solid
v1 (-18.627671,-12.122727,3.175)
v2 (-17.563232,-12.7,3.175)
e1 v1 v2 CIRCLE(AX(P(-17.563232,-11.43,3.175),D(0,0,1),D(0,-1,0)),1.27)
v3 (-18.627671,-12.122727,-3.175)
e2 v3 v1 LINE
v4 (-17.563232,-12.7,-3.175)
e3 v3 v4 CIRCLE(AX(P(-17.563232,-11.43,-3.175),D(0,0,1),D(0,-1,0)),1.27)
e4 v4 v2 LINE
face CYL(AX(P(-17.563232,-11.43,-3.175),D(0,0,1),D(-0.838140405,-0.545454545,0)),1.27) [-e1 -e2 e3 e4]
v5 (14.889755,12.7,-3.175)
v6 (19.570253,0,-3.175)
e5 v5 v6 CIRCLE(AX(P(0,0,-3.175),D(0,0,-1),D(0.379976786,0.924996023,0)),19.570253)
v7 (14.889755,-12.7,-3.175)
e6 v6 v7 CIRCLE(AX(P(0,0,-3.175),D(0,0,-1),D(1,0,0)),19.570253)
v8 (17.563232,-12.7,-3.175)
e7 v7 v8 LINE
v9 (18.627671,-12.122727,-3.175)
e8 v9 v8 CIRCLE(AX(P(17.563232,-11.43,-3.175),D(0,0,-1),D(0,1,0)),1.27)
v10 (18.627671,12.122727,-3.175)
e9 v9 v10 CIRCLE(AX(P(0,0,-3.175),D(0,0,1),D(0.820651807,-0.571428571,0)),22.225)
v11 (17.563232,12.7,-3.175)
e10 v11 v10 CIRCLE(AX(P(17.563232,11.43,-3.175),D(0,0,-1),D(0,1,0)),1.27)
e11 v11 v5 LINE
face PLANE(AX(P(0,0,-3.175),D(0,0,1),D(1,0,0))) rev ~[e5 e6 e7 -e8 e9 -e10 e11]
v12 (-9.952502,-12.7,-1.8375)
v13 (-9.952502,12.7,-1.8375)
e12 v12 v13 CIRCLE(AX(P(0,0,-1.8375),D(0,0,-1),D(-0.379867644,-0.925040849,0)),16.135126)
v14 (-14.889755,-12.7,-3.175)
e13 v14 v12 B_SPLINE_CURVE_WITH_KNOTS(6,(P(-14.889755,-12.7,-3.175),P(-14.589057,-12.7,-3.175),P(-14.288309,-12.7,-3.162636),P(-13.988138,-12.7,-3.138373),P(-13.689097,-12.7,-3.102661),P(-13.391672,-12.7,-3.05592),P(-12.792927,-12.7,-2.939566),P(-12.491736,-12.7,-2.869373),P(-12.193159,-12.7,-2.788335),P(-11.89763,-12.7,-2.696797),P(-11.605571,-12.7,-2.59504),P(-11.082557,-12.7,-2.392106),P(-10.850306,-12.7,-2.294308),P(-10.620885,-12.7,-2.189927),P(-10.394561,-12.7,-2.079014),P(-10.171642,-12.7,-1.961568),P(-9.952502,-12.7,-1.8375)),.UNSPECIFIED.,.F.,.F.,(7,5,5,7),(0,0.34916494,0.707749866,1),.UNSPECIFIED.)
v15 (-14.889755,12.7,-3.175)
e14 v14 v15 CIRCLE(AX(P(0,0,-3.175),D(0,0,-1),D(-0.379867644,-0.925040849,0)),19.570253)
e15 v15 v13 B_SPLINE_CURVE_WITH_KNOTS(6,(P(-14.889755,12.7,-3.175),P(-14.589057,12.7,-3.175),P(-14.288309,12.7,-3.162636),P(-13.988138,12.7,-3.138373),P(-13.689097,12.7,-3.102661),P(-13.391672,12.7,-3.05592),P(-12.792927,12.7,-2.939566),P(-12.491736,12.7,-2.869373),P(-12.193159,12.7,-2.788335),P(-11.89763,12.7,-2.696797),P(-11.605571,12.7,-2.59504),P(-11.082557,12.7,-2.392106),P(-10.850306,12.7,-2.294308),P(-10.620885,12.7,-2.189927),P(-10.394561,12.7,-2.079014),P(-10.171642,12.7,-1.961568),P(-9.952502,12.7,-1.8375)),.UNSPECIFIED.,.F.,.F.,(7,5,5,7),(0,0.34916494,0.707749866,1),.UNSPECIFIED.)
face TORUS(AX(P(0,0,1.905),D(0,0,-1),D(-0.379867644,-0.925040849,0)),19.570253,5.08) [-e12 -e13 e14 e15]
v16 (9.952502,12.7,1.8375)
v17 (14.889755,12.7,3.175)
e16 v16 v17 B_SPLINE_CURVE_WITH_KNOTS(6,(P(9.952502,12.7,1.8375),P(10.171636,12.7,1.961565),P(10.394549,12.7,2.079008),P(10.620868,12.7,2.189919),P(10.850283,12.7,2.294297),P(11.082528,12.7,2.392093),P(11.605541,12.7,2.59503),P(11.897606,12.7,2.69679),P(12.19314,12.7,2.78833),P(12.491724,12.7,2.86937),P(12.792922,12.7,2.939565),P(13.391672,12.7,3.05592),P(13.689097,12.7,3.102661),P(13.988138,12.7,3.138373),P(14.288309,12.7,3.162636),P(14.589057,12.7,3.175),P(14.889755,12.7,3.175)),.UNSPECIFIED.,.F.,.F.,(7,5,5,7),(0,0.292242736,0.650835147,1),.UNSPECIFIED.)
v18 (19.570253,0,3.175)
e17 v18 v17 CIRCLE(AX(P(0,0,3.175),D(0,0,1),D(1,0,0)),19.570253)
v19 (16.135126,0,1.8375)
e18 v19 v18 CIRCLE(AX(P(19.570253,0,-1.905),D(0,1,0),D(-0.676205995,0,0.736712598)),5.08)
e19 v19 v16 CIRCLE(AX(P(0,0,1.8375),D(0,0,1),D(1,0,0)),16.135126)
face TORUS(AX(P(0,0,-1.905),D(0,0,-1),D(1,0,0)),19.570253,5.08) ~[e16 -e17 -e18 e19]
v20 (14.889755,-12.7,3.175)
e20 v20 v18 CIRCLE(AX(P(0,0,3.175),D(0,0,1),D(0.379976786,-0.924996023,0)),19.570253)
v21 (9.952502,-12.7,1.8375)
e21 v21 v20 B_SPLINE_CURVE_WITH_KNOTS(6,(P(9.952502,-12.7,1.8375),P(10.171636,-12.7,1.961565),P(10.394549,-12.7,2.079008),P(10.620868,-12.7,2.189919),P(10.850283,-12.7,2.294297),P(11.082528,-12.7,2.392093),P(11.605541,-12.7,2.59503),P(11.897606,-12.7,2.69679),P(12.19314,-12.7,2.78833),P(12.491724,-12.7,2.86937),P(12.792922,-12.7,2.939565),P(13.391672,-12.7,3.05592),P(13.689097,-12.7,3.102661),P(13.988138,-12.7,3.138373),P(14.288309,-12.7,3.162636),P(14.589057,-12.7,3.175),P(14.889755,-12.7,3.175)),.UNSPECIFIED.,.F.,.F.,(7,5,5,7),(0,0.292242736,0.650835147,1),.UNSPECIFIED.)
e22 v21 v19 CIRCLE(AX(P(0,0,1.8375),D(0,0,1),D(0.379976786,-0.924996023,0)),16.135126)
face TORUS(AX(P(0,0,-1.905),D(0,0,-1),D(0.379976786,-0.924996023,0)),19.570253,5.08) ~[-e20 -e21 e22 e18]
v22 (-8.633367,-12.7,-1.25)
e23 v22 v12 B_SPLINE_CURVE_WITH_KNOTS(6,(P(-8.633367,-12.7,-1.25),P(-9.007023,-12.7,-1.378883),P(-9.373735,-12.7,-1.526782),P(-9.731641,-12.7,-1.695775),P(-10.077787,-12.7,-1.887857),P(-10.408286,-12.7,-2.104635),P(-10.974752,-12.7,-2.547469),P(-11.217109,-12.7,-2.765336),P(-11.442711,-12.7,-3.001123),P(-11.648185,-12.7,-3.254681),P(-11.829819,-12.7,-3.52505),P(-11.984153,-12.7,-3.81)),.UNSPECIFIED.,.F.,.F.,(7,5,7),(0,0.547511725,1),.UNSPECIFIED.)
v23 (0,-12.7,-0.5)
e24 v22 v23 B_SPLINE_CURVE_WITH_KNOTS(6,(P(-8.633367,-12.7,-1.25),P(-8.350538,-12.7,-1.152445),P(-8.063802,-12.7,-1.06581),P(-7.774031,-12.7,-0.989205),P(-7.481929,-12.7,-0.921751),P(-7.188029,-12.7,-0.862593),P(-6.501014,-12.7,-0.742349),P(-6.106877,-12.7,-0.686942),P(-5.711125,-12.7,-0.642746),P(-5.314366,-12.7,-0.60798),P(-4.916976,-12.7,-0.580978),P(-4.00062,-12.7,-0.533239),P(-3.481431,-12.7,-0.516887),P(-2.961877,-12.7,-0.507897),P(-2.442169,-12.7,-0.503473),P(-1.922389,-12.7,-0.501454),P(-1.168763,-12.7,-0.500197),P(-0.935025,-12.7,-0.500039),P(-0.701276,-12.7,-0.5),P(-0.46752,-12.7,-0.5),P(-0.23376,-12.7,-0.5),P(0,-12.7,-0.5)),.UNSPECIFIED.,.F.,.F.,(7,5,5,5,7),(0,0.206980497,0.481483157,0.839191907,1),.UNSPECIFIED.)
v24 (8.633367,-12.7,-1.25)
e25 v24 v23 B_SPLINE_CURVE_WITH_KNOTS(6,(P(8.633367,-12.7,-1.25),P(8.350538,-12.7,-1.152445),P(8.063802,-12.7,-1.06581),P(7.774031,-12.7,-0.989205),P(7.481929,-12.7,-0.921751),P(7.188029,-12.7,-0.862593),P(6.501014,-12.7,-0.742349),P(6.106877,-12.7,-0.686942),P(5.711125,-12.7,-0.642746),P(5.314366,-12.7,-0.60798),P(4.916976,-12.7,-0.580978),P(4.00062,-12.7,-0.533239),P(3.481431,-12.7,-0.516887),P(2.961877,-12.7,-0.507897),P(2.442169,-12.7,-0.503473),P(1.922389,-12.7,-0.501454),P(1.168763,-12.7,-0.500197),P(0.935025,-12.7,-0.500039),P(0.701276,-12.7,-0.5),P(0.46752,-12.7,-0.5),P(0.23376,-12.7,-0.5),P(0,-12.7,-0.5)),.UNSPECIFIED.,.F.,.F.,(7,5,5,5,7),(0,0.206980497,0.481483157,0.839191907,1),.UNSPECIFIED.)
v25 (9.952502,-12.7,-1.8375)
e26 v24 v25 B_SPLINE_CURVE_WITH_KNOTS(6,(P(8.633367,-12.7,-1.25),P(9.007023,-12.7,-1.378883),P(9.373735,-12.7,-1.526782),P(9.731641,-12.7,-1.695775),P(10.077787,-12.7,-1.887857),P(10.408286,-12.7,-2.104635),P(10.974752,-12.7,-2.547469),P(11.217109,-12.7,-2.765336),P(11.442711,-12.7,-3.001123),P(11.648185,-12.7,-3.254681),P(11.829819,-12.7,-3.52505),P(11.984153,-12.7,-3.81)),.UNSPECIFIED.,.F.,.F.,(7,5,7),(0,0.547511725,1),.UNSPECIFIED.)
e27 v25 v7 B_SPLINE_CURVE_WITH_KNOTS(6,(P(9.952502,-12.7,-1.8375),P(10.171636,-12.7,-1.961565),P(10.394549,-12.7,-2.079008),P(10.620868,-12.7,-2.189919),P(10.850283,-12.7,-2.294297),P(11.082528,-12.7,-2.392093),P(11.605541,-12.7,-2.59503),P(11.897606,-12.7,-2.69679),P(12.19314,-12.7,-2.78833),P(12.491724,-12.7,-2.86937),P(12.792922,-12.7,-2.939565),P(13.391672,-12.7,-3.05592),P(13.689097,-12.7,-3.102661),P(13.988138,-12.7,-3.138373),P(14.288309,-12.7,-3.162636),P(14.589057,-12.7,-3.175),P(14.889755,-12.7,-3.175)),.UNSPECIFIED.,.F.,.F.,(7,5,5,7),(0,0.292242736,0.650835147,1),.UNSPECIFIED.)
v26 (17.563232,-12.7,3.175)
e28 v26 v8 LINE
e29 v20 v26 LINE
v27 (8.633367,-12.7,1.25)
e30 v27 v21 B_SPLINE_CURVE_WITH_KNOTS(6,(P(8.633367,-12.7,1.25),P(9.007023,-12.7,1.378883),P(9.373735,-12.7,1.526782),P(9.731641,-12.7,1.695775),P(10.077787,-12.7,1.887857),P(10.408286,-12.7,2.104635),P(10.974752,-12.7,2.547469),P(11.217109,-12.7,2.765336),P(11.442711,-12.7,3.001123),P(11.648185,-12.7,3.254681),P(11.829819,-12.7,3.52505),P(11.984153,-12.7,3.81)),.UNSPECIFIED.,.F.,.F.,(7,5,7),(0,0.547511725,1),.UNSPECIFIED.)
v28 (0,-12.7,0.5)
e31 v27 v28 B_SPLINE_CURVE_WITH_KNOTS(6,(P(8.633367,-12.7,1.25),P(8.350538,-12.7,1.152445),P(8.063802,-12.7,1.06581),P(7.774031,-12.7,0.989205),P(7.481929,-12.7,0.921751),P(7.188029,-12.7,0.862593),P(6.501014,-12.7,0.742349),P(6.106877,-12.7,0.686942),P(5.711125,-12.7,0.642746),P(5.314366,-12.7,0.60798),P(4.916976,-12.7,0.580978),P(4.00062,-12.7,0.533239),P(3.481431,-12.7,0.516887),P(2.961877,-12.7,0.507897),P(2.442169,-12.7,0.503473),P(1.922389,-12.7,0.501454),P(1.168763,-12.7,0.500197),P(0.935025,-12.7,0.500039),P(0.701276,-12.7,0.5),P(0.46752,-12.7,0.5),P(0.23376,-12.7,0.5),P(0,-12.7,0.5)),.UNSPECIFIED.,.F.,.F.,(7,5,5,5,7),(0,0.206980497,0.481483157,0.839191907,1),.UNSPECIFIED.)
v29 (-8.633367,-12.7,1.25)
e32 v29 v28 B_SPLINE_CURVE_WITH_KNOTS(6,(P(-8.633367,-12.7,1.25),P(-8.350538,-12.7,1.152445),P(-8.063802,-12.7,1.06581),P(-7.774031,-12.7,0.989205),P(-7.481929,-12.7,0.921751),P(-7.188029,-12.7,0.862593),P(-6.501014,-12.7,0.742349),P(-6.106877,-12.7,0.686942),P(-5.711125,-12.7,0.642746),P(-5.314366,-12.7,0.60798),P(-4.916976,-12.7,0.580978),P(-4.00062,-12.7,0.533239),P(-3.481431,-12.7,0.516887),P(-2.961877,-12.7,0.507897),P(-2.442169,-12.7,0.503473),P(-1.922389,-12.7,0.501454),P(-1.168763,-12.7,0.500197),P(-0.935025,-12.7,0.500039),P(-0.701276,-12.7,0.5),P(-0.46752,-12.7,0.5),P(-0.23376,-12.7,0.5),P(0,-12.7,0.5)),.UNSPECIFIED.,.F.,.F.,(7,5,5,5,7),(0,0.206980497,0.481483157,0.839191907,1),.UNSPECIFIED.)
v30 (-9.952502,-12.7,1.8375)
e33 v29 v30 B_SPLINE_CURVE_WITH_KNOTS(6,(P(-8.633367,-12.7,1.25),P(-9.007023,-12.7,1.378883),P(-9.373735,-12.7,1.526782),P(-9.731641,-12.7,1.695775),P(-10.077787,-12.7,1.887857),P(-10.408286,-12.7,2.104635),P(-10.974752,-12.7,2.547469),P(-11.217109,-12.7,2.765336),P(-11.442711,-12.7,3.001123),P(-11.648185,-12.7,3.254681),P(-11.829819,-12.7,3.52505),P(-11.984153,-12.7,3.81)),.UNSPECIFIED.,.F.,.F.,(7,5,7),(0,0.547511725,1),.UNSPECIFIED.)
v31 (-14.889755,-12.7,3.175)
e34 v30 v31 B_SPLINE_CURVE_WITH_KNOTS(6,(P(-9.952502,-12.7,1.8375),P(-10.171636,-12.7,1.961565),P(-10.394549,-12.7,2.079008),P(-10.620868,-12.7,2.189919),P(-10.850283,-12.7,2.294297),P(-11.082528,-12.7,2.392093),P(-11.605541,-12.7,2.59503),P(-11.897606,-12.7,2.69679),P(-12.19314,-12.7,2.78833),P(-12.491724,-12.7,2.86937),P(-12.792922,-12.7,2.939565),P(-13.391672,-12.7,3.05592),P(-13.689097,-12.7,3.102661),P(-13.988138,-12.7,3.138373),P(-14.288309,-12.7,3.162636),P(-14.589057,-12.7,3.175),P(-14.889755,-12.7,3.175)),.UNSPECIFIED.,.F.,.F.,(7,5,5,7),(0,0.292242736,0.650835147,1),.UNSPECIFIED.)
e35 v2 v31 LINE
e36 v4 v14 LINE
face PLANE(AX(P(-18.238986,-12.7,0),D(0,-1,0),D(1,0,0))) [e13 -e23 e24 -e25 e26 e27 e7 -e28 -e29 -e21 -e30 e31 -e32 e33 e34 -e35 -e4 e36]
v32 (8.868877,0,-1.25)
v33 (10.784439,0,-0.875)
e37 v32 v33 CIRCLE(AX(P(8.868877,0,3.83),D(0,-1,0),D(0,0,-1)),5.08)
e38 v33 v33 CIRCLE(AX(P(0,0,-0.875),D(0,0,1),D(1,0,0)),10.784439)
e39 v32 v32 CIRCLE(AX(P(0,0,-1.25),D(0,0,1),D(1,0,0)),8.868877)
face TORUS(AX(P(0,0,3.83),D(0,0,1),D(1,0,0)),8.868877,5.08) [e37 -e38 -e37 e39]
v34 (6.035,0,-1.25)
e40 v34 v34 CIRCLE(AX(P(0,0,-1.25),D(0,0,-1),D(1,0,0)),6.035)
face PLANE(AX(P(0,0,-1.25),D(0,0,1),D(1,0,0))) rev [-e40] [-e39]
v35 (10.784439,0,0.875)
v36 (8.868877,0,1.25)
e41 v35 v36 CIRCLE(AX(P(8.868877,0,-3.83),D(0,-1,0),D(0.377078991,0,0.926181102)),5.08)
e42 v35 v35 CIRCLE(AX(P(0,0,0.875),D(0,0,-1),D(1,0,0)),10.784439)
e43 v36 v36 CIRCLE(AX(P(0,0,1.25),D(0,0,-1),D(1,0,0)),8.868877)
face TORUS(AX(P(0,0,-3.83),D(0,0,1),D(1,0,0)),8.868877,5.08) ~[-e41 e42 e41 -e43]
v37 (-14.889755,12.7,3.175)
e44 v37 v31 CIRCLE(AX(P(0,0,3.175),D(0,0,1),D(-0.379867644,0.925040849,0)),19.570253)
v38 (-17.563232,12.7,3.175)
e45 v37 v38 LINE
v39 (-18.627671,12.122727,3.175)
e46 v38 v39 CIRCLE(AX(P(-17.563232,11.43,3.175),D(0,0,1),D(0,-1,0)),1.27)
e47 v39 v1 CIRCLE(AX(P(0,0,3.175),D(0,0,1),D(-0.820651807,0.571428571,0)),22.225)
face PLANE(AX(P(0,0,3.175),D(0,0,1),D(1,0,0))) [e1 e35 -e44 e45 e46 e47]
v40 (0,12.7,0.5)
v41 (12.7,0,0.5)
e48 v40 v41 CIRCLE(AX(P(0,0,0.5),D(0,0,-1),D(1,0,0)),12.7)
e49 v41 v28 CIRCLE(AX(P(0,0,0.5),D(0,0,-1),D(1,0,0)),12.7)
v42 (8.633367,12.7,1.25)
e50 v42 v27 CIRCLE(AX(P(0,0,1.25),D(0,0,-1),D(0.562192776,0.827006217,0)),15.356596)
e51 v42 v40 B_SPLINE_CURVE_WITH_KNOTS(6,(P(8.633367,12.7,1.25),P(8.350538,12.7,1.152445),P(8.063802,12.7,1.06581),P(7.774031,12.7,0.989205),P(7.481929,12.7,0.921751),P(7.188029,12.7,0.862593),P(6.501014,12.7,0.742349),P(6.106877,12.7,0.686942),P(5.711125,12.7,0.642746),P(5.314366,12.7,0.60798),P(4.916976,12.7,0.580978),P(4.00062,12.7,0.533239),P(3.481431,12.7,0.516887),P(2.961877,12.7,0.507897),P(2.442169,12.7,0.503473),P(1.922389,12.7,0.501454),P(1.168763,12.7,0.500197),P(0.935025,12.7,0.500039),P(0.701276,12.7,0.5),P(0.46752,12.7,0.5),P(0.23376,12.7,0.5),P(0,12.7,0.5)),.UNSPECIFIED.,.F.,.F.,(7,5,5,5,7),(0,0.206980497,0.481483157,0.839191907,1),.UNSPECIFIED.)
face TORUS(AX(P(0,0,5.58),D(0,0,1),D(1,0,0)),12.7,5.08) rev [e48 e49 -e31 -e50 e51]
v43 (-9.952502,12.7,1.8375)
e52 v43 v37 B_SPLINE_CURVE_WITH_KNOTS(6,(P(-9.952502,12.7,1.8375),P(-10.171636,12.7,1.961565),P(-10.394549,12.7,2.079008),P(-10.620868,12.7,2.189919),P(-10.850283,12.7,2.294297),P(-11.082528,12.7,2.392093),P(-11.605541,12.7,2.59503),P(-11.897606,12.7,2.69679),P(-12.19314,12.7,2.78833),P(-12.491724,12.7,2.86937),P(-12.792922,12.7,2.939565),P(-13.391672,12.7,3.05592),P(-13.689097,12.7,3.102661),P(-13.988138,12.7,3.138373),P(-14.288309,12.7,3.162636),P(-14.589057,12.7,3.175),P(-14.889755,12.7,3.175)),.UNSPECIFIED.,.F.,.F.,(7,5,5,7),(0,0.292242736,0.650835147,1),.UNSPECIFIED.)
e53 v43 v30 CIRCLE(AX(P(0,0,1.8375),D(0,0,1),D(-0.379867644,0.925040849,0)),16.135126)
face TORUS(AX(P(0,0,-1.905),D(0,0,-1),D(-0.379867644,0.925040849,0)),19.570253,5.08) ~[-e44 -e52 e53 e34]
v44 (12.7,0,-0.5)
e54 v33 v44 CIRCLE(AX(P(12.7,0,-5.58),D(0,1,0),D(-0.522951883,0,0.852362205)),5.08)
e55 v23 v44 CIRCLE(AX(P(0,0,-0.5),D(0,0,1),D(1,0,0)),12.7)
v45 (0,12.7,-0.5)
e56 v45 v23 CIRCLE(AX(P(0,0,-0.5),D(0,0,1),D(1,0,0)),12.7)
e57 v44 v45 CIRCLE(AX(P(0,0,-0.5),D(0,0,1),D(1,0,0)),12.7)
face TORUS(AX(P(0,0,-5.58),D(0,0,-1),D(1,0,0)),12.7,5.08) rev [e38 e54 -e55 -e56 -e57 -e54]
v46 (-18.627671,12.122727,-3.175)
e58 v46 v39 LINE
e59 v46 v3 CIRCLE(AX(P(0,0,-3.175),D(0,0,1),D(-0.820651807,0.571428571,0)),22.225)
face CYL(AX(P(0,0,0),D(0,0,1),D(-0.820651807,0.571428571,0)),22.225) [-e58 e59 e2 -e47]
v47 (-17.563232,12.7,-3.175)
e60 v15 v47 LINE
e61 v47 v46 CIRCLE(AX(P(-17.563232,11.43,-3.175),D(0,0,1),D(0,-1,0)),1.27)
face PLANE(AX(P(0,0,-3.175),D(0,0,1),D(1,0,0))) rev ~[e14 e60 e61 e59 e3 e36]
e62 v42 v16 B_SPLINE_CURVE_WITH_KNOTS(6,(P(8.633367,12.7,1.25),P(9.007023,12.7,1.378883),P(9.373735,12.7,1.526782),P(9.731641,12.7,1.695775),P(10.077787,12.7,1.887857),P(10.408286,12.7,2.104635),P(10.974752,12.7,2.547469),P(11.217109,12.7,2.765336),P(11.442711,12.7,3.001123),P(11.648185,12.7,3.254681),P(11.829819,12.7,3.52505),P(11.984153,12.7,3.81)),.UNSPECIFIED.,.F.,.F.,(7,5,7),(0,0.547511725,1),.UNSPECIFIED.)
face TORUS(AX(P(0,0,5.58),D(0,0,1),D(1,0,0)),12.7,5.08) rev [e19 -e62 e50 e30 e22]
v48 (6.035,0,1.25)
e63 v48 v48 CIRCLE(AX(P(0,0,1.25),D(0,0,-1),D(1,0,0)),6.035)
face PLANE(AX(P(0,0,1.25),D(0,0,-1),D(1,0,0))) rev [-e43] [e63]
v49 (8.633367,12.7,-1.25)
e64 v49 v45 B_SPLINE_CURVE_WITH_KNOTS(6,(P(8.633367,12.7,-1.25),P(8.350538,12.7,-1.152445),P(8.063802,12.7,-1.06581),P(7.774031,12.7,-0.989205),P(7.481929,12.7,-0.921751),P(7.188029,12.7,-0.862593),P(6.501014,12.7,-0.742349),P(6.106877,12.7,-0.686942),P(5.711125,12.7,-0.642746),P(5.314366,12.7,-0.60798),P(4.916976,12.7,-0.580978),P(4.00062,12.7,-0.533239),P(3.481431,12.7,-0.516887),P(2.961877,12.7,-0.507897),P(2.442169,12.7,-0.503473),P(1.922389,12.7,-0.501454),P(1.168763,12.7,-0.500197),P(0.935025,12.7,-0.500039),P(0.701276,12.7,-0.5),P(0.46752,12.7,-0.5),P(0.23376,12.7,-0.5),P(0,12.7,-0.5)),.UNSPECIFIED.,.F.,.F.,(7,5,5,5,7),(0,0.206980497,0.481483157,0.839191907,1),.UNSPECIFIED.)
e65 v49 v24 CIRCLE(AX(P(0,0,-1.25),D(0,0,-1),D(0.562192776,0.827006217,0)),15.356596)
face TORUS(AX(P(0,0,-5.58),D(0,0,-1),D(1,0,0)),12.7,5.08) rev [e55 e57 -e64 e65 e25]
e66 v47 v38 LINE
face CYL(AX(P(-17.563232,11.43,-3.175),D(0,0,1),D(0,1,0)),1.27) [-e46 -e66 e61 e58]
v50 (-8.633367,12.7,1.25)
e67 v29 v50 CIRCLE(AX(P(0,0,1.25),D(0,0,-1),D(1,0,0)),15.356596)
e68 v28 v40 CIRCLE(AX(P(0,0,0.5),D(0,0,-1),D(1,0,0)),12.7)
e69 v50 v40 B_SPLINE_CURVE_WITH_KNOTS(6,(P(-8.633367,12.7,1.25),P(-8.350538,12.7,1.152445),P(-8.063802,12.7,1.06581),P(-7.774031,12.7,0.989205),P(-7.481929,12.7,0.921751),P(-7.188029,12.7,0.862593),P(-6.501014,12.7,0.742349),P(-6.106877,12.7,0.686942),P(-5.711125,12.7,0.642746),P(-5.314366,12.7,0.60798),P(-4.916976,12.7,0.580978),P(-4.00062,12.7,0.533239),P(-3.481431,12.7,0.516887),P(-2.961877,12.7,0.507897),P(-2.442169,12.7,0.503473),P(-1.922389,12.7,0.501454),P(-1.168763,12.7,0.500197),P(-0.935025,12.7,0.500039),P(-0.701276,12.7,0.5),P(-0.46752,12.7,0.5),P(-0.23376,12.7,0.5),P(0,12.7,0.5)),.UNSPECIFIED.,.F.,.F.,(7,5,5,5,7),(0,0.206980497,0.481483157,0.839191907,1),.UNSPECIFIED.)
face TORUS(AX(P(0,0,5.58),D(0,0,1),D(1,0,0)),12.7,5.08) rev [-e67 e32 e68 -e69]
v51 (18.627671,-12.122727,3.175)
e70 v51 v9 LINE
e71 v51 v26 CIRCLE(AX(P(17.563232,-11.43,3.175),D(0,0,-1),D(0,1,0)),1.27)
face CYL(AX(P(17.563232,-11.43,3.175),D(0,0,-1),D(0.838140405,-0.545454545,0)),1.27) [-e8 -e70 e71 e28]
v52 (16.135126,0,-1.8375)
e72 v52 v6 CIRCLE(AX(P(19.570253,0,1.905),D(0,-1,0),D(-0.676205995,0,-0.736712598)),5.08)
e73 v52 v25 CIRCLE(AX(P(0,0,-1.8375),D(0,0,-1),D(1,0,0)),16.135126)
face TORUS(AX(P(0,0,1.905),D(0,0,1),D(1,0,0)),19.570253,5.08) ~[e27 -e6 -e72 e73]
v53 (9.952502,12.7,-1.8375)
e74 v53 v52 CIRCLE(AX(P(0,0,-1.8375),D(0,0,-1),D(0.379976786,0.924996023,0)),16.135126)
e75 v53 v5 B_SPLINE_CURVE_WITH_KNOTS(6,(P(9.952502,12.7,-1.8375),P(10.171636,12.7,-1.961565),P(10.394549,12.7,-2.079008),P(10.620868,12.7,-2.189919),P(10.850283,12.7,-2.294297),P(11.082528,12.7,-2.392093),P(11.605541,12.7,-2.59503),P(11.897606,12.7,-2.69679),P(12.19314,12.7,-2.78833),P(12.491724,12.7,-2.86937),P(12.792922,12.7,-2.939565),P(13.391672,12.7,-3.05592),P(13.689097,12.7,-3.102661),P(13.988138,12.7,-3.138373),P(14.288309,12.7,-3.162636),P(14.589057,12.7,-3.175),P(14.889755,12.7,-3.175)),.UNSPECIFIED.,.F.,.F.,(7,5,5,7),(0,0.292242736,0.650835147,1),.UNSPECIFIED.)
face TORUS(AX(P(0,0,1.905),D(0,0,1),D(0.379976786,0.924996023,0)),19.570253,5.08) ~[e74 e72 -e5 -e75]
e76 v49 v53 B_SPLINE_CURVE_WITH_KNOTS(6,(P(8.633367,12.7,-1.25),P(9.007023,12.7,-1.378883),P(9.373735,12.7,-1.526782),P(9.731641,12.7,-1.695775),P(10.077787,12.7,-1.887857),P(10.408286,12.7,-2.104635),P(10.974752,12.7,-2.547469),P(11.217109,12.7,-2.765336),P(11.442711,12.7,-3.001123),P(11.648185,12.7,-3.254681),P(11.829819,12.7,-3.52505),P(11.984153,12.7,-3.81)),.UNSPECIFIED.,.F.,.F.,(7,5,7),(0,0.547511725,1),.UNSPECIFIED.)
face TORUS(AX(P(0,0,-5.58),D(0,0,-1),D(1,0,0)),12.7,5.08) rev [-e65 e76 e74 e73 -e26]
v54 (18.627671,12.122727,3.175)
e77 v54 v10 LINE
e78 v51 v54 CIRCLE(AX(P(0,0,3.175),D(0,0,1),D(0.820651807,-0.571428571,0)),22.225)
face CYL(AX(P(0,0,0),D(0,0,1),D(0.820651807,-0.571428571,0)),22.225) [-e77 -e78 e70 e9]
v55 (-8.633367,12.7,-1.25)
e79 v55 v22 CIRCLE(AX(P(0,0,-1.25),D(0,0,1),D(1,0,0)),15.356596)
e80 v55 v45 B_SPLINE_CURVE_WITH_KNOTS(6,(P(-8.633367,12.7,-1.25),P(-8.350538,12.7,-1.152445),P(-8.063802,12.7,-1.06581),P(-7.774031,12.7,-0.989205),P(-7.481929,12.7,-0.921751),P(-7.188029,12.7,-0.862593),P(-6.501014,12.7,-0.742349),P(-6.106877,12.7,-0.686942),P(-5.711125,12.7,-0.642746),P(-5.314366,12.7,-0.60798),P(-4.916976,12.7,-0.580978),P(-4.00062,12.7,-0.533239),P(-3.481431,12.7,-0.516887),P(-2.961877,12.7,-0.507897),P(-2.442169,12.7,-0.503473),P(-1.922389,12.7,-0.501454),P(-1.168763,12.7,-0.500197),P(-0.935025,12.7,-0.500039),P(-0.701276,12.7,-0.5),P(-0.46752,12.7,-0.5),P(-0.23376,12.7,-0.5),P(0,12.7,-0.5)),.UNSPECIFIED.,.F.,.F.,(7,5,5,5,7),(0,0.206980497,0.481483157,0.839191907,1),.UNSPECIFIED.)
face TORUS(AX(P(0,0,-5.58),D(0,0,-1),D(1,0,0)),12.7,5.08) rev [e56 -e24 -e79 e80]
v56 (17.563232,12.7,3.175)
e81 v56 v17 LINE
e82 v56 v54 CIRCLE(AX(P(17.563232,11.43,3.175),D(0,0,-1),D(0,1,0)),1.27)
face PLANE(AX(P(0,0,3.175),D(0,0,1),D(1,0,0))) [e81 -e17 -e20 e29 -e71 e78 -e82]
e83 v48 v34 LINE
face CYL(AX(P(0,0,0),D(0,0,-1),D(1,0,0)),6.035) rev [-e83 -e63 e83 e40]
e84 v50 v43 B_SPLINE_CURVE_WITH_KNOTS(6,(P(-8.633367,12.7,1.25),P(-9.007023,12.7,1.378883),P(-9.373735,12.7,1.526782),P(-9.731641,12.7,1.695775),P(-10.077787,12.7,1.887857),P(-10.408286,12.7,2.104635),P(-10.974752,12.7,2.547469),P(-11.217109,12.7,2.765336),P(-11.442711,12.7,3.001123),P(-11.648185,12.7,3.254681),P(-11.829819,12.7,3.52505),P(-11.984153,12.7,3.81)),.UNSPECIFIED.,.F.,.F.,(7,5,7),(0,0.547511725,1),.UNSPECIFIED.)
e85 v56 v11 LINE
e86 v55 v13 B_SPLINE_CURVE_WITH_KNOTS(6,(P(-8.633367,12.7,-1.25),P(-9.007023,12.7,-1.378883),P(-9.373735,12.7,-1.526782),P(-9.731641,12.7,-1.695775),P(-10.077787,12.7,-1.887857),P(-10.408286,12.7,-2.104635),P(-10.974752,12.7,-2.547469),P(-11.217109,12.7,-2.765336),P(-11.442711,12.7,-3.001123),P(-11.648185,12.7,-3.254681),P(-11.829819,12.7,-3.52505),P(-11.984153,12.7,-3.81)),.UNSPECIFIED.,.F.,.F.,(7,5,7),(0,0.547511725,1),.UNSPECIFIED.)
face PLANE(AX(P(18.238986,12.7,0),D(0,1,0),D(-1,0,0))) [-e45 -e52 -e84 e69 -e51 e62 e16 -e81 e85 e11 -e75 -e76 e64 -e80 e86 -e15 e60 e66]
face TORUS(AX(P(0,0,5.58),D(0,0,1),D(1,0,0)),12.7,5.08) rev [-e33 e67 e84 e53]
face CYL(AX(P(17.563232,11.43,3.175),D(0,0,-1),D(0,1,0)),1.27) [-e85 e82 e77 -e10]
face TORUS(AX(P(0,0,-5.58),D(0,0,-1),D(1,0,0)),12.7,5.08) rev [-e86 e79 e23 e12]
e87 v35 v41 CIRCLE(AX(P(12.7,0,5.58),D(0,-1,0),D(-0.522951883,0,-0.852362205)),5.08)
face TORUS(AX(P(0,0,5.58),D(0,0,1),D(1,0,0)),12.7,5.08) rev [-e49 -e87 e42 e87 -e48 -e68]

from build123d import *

# Parameters (mm, degrees)
F0_R            = 6.035
F1_DEPTH        = 3.175
F3_COPIES_COUNT = 2
F4_T3_ANGLE     = 67.6677552602
F4_T6_ANGLE     = 67.6677552602
F4_T9_ANGLE     = 135.3490310549
F4_T18_ANGLE    = 135.3490310549
F4_T21_ANGLE    = 67.6677552602
F4_T24_ANGLE    = 67.6677552602
F5_R            = 1.27


# Not quite as in the source:
# - a fillet or chamfer that OpenCascade refuses, or shapes differently, is made with other operations: its cross-section is extruded or revolved along the edge and cut away or added
# - a pattern or mirror of a feature is missing from the dataset's text; its kind, count and spacing are read off the source's solid


with BuildPart() as f1:
    # F0 (on Top) → F1 (new body, symmetric)
    with BuildSketch(Plane.XY):
        with BuildLine():
            Line((18.2389864028, 12.7), (-18.2389864028, 12.7))
            ThreePointArc((-18.2389864028, 12.7), (-22.225, 0), (-18.2389864028, -12.7))
            Line((-18.2389864028, -12.7), (18.2389864028, -12.7))
            ThreePointArc((18.2389864028, -12.7), (22.225, 0), (18.2389864028, 12.7))
        make_face()
        Circle(F0_R, mode=Mode.SUBTRACT)
    extrude(amount=F1_DEPTH, both=True)

    # F2 (on Front) → F3 (revolve, cut)
    with BuildSketch(Plane.XZ):
        with BuildLine():
            ThreePointArc((15.3565955658, 1.25), (17.1329395143, 3.0989826153), (17.78, 5.58))
            ThreePointArc((17.78, 5.58), (13.844578608, 10.5293777195), (8.1357717283, 7.8102960081))
            ThreePointArc((8.1357717283, 7.8102960081), (7.8220449826, 4.1615660577), (10.0434044342, 1.25))
            Line((10.0434044342, 1.25), (12.7, 1.25))
            Line((12.7, 1.25), (15.3565955658, 1.25))
        make_face()
        with BuildLine():
            ThreePointArc((10.0434044342, 1.25), (7.8220449826, 4.1615660577), (8.1357717283, 7.8102960081))
            Line((8.1357717283, 7.8102960081), (0, 7.8102960081))
            Line((0, 7.8102960081), (0, 1.25))
            Line((0, 1.25), (10.0434044342, 1.25))
        make_face()
        with BuildLine():
            ThreePointArc((12.7, 0.5), (14.0802173742, 0.6910941919), (15.3565955658, 1.25))
            Line((15.3565955658, 1.25), (12.7, 1.25))
            Line((12.7, 1.25), (12.7, 0.5))
        make_face()
        with BuildLine():
            Line((12.7, 1.25), (10.0434044342, 1.25))
            ThreePointArc((10.0434044342, 1.25), (11.3197826258, 0.6910941919), (12.7, 0.5))
            Line((12.7, 0.5), (12.7, 1.25))
        make_face()
    f3 = revolve(axis=Axis((0, 0, 0), (0, 0, -1)), mode=Mode.SUBTRACT)

    # F3_copies: F3 ×2 about axis
    f3_copies_axis = Axis((0, 0, 0), (1, 0, 0))
    for i in range(1, F3_COPIES_COUNT):
        add(f3.rotate(f3_copies_axis, i * 360 / F3_COPIES_COUNT), mode=Mode.SUBTRACT)

    # F4: fillet of radius 5.08 on 9 edges, made by hand


with BuildPart() as f4_tool1:
    # F4_s2 → F4_t3 (revolve)
    with BuildSketch(Plane(origin=(0, 0, 0), x_dir=(0, 0, 1), z_dir=(-0.9249960227, -0.379976786, 0))):
        with BuildLine():
            ThreePointArc((1.8375, -16.1351264533), (2.828830373, -17.7270898644), (3.175, -19.5702529066))
            Line((3.175, -19.5702529066), (3.175, -17.1746368568))
            ThreePointArc((3.175, -17.1746368568), (2.4626157548, -16.7110242417), (1.8375, -16.1351264533))
        make_face()
    revolve(axis=Axis((0, 0, 3.175), (0, 0, 1)), revolution_arc=F4_T3_ANGLE)


with BuildPart() as f4_tool4:
    # F4_s5 → F4_t6 (revolve)
    with BuildSketch(Plane.XZ):
        with BuildLine():
            ThreePointArc((16.1351264533, 1.8375), (17.7270898644, 2.828830373), (19.5702529066, 3.175))
            Line((19.5702529066, 3.175), (17.1746368568, 3.175))
            ThreePointArc((17.1746368568, 3.175), (16.7110242417, 2.4626157548), (16.1351264533, 1.8375))
        make_face()
    revolve(axis=Axis((0, 0, 3.175), (0, 0, 1)), revolution_arc=F4_T6_ANGLE)


with BuildPart() as f4_tool7:
    # F4_s8 → F4_t9 (revolve)
    with BuildSketch(Plane(origin=(0, 0, 0), x_dir=(0, 0, 1), z_dir=(0.9250408493, 0.3798676441, 0))):
        with BuildLine():
            ThreePointArc((1.8375, -16.1351264533), (2.828830373, -17.7270898644), (3.175, -19.5702529066))
            Line((3.175, -19.5702529066), (3.175, -17.1746368568))
            ThreePointArc((3.175, -17.1746368568), (2.4626157548, -16.7110242417), (1.8375, -16.1351264533))
        make_face()
    revolve(axis=Axis((0, 0, 3.175), (0, 0, 1)), revolution_arc=F4_T9_ANGLE)


with BuildPart() as f4_tool10:
    # F4_s11 → F4_t12 (revolve)
    with BuildSketch(Plane.XZ):
        with BuildLine():
            ThreePointArc((10.7844387246, 0.875), (9.8448385139, 1.1553685922), (8.8688774491, 1.25))
            Line((8.8688774491, 1.25), (10.0434044342, 1.25))
            ThreePointArc((10.0434044342, 1.25), (10.4062452626, 1.0473308962), (10.7844387246, 0.875))
        make_face()
    revolve(axis=Axis((0, 0, 1.25), (0, 0, -1)))


with BuildPart() as f4_tool13:
    # F4_s14 → F4_t15 (revolve)
    with BuildSketch(Plane.XZ):
        with BuildLine():
            ThreePointArc((8.8688774491, -1.25), (9.8448385139, -1.1553685922), (10.7844387245, -0.875))
            ThreePointArc((10.7844387245, -0.875), (10.4062452626, -1.0473308962), (10.0434044342, -1.25))
            Line((10.0434044342, -1.25), (8.8688774491, -1.25))
        make_face()
    revolve(axis=Axis((0, 0, -1.25), (0, 0, 1)))


with BuildPart() as f4_tool16:
    # F4_s17 → F4_t18 (revolve)
    with BuildSketch(Plane(origin=(0, 0, 0), x_dir=(0, 0, 1), z_dir=(0.9250408493, -0.3798676441, 0))):
        with BuildLine():
            ThreePointArc((-3.175, 19.5702529066), (-2.828830373, 17.7270898644), (-1.8375, 16.1351264533))
            ThreePointArc((-1.8375, 16.1351264533), (-2.4626157548, 16.7110242417), (-3.175, 17.1746368568))
            Line((-3.175, 17.1746368568), (-3.175, 19.5702529066))
        make_face()
    revolve(axis=Axis((0, 0, -3.175), (0, 0, -1)), revolution_arc=F4_T18_ANGLE)


with BuildPart() as f4_tool19:
    # F4_s20 → F4_t21 (revolve)
    with BuildSketch(Plane.XZ):
        with BuildLine():
            ThreePointArc((16.1351264533, -1.8375), (17.7270898644, -2.828830373), (19.5702529066, -3.175))
            Line((19.5702529066, -3.175), (17.1746368568, -3.175))
            ThreePointArc((17.1746368568, -3.175), (16.7110242417, -2.4626157548), (16.1351264533, -1.8375))
        make_face()
    revolve(axis=Axis((0, 0, -3.175), (0, 0, -1)), revolution_arc=F4_T21_ANGLE)


with BuildPart() as f4_tool22:
    # F4_s23 → F4_t24 (revolve)
    with BuildSketch(Plane(origin=(0, 0, 0), x_dir=(0, 0, 1), z_dir=(-0.9249960227, 0.379976786, 0))):
        with BuildLine():
            ThreePointArc((-1.8375, 16.1351264533), (-2.828830373, 17.7270898644), (-3.175, 19.5702529066))
            Line((-3.175, 19.5702529066), (-3.175, 17.1746368568))
            ThreePointArc((-3.175, 17.1746368568), (-2.4626157548, 16.7110242417), (-1.8375, 16.1351264533))
        make_face()
    revolve(axis=Axis((0, 0, -3.175), (0, 0, -1)), revolution_arc=F4_T24_ANGLE)


with BuildPart() as f1_1:
    add(f1.part)

    # F4_t25: cut F4_tool1, F4_tool4, F4_tool7, F4_tool10, F4_tool13, F4_tool16, F4_tool19, F4_tool22
    add([f4_tool1.part, f4_tool4.part, f4_tool7.part, f4_tool10.part, f4_tool13.part, f4_tool16.part, f4_tool19.part, f4_tool22.part], mode=Mode.SUBTRACT)

    # F5
    f5_edges = [f1_1.edges().sort_by_distance(p)[0] for p in [
        (-18.238986, -12.7, 0),
        (-18.238986, 12.7, 0),
        (18.238986, 12.7, 0),
        (18.238986, -12.7, 0),
    ]]
    fillet(f5_edges, radius=F5_R)


solid = f1_1.part
